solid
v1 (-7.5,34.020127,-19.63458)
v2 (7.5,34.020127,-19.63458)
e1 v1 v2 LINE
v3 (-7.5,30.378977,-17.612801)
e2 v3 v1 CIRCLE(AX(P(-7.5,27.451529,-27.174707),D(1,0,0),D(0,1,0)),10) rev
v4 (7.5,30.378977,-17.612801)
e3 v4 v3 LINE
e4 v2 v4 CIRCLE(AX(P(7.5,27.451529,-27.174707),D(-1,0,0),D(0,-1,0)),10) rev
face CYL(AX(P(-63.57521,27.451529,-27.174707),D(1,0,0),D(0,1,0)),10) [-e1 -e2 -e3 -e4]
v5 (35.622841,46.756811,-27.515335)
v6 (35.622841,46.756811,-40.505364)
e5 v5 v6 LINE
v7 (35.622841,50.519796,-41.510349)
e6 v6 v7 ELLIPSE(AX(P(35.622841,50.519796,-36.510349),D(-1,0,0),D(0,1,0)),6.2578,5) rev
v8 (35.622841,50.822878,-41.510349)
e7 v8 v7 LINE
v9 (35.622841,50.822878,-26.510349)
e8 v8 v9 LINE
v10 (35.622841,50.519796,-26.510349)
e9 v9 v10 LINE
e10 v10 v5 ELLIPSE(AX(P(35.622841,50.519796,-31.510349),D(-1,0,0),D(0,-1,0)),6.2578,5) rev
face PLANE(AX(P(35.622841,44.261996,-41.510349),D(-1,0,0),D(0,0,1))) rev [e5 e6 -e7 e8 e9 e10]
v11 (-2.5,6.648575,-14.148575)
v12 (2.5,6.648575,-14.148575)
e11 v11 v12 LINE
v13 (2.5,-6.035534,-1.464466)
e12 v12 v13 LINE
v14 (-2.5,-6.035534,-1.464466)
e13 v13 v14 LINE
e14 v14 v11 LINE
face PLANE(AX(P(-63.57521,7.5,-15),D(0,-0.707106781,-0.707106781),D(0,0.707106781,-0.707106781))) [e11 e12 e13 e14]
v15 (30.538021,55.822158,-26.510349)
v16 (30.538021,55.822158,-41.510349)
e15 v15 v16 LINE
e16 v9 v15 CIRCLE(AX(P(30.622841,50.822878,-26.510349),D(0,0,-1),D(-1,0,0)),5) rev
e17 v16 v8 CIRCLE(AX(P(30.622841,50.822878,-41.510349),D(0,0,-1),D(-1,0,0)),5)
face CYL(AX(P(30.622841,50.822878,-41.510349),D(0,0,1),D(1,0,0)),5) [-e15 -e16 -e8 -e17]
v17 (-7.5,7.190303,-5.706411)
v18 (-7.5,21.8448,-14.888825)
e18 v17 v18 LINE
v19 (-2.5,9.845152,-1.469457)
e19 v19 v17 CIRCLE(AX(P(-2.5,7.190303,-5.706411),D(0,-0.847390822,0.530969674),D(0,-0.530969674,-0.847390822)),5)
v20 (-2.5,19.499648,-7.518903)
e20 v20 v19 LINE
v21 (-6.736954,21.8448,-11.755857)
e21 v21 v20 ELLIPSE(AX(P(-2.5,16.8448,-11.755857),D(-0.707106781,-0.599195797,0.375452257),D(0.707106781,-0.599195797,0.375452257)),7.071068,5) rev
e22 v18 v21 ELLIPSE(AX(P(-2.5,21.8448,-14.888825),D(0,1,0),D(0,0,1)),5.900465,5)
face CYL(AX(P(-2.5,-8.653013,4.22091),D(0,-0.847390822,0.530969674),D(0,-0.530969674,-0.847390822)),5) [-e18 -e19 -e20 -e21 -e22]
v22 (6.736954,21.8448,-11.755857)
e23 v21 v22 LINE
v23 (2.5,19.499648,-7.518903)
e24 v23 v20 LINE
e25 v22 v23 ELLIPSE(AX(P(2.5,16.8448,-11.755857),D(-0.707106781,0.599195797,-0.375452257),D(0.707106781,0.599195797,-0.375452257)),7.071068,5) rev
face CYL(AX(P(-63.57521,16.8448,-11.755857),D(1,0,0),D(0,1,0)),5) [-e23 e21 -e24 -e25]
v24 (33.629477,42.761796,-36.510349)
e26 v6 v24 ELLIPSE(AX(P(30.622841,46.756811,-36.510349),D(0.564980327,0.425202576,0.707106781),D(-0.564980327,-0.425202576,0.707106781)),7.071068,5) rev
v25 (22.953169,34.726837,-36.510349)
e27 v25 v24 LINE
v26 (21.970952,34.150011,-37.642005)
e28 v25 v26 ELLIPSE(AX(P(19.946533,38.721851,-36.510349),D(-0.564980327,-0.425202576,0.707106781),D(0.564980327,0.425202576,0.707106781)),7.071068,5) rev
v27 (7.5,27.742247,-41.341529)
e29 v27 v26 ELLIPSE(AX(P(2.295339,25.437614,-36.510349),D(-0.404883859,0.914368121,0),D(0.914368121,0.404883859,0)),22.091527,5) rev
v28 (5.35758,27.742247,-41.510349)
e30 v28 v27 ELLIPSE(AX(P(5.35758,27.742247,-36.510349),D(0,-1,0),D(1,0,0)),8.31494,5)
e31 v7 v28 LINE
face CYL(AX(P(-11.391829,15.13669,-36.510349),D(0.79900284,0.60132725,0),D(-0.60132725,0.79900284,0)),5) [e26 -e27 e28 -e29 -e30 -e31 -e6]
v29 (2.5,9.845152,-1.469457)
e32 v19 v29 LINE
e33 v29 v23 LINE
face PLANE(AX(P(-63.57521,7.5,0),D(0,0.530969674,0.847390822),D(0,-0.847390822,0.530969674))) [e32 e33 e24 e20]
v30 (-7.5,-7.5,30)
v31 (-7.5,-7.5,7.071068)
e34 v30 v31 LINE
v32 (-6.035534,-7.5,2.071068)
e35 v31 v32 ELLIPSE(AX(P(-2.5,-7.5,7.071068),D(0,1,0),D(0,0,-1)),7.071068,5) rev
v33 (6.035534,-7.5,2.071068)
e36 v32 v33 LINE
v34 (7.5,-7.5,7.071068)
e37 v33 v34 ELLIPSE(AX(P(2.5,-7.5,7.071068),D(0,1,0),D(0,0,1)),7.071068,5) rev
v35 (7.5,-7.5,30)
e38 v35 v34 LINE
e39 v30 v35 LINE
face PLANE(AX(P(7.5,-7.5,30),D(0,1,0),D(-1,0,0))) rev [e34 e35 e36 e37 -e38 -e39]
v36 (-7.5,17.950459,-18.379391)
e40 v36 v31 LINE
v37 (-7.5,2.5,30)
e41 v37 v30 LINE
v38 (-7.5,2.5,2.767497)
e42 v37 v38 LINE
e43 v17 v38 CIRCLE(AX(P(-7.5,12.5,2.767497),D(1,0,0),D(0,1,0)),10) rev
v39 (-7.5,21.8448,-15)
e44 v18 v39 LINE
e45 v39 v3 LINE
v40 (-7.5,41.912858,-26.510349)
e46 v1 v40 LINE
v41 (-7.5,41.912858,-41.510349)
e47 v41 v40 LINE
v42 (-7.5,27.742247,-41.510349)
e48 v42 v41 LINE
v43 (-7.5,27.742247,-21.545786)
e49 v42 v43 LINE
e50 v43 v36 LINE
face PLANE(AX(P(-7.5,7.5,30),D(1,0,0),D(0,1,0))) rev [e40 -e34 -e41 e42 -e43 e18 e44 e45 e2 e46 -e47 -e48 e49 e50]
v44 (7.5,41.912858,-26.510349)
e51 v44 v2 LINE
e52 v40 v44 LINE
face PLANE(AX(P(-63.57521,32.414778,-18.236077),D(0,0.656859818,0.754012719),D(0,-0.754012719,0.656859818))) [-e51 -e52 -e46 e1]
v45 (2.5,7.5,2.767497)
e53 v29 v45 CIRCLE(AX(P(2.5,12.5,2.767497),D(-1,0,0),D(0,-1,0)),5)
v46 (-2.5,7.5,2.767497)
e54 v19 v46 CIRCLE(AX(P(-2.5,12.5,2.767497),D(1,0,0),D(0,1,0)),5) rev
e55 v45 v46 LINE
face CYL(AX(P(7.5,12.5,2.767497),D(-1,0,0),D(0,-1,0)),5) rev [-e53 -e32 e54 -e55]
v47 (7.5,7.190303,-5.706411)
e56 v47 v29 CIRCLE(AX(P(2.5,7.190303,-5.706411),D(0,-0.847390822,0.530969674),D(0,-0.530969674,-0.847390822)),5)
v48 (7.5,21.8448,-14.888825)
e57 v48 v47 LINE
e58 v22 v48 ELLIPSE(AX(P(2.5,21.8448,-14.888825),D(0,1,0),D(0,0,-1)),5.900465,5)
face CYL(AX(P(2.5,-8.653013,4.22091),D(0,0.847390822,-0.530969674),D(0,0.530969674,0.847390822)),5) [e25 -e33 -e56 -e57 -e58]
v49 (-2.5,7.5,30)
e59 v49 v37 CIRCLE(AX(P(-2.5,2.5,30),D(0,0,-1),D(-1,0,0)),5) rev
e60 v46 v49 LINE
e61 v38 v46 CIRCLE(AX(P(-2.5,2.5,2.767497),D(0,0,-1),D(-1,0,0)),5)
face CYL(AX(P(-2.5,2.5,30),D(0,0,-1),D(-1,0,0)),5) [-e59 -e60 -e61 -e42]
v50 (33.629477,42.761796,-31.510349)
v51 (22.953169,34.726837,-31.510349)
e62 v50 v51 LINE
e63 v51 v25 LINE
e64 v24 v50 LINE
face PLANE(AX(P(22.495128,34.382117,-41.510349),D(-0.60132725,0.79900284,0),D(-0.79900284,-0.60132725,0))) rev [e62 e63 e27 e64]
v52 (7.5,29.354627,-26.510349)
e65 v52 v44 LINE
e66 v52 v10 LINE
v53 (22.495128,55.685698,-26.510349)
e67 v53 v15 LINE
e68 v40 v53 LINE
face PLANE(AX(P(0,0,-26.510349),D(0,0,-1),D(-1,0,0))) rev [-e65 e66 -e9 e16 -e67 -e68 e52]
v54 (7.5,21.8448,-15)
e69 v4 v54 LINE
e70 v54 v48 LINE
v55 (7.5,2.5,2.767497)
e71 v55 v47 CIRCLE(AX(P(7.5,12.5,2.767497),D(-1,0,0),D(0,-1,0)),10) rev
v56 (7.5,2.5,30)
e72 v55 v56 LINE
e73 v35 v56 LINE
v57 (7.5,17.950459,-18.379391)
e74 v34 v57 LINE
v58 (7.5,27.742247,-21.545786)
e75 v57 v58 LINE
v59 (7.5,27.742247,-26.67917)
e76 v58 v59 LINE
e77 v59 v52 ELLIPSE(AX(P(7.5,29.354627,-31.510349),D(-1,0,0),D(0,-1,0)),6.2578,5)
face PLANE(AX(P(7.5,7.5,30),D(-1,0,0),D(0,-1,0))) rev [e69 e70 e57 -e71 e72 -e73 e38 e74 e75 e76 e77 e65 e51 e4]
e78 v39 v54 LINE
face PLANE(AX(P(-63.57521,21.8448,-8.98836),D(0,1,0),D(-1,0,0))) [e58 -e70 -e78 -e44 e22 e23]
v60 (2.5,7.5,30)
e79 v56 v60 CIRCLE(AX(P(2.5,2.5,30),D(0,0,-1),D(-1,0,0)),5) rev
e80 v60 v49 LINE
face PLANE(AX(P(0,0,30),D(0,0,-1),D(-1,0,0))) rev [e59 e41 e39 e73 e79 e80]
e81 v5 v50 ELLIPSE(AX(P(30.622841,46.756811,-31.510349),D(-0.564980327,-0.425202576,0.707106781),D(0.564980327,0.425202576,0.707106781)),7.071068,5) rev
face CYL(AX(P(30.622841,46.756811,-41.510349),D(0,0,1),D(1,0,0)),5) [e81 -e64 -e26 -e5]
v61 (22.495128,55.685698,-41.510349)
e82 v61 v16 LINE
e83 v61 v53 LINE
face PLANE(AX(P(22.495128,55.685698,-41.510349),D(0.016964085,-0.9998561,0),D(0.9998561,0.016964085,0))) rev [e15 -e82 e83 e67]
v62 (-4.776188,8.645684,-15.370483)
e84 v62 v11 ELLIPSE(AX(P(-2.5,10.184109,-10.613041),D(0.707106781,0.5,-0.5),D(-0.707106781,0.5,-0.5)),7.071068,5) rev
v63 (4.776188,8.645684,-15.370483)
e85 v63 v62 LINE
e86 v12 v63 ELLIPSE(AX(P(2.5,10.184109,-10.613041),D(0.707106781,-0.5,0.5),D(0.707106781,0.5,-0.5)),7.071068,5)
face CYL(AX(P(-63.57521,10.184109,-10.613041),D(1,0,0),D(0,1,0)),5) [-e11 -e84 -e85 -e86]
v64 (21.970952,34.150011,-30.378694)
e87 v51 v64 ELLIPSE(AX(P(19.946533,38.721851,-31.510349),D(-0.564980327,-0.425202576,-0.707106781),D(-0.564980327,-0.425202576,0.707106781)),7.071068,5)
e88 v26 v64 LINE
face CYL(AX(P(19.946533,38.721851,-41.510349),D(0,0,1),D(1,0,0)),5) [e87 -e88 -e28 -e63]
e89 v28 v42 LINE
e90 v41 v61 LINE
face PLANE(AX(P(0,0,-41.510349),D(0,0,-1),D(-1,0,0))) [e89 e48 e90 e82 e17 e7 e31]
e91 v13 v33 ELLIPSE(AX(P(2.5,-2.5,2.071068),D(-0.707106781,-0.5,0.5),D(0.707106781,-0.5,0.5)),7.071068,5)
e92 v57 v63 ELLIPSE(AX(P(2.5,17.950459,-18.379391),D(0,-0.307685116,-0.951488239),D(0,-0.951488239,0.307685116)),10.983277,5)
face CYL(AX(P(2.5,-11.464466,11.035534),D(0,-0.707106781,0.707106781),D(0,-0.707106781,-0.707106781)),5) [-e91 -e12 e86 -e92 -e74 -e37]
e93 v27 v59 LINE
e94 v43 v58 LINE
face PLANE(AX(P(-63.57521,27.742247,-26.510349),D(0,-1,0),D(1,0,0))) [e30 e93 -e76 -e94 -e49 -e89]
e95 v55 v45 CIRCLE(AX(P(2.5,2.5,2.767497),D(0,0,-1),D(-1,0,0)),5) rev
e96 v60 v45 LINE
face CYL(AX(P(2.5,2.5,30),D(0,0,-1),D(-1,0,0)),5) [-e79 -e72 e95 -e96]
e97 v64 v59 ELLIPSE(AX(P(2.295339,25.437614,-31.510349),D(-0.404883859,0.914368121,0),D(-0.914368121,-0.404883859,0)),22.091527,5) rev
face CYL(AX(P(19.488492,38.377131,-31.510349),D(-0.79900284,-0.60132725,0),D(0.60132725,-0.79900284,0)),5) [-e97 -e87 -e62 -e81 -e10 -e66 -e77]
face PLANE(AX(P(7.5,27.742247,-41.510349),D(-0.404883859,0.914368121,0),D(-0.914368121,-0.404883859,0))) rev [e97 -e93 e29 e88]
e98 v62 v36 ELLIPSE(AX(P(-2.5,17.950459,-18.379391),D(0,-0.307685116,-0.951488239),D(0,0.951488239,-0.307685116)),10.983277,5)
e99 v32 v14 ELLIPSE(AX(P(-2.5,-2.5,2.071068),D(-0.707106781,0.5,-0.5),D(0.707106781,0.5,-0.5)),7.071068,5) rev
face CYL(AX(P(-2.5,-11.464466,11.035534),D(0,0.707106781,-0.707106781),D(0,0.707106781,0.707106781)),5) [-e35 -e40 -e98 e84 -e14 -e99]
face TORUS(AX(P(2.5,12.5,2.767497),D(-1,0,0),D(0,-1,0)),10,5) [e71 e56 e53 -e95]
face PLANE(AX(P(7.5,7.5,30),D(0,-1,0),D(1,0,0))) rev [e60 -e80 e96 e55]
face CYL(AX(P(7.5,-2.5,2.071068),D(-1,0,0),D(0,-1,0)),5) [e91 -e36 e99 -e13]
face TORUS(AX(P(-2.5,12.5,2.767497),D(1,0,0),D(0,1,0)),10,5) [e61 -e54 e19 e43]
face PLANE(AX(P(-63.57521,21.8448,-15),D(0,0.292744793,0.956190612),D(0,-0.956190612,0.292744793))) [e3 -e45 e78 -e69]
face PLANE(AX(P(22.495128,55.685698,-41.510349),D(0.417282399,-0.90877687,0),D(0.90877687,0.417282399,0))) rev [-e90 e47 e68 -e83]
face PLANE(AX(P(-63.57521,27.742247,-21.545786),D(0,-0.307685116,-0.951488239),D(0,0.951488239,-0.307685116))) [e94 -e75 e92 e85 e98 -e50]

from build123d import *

# Parameters (mm, degrees)
SKETCH1_W           = 15
SKETCH1_H           = 15
BOSS_EXTRUDE1_DEPTH = 30
BOSS_EXTRUDE2_DEPTH = 15
BOSS_EXTRUDE3_DEPTH = 15
FILLET1_R           = 5
FILLET2_R           = 5
FILLET3_R           = 5
FILLET4_R           = 5
FILLET5_R           = 10


with BuildPart() as part:
    # Sketch1 → Boss-Extrude1 (new body)
    with BuildSketch(Plane.XY):
        Rectangle(SKETCH1_W, SKETCH1_H)
    extrude(amount=BOSS_EXTRUDE1_DEPTH)

    # Sketch2 → Boss-Extrude2 (add)
    with BuildSketch(Plane(origin=(7.5, 0, 0), x_dir=(0, 0, -1), z_dir=(1, 0, 0))):
        Polygon((0, 7.5), (0, -7.5), (15, 7.5), (21.545785732, 27.742247112), (26.510349476, 27.742247112), (26.510349476, 32.414777695), (26.510349476, 41.912857566), (18.236076569, 32.414777695), (15, 21.844799658), (8.988359791, 21.844799658), align=None)
    extrude(amount=-BOSS_EXTRUDE2_DEPTH)

    # Sketch3 → Boss-Extrude3 (add)
    with BuildSketch(Plane(origin=(0, 0, -26.510349476), x_dir=(-1, 0, 0), z_dir=(0, 0, -1))):
        Polygon((-7.5, 27.742247112), (-22.495127837, 34.382116855), (-35.622841112, 44.261996271), (-35.622841112, 55.90842978), (-22.495127837, 55.685698079), (7.5, 41.912857566), (7.5, 27.742247112), align=None)
    extrude(amount=BOSS_EXTRUDE3_DEPTH)

    # Fillet1
    fillet1_edges = [part.edges().sort_by_distance(p)[0] for p in [
        (35.622841112, 55.90842978, -34.010349476),
    ]]
    fillet(fillet1_edges, radius=FILLET1_R)

    # Fillet2
    # the kernel refuses this fillet: 5 mm, written as the material it takes off along each edge
    with BuildSketch(Plane(origin=(-7.467478677, 11.832344997, -41.510349476), x_dir=(0, 0, 1), z_dir=(0.7990028403879673, 0.6013272495504927, 0))) as fillet2_piece_1:
        with BuildLine():
            CenterArc((FILLET2_R, -FILLET2_R), FILLET2_R, 90, 90)
            Line((0, -FILLET2_R), (0, 0))
            Line((0, 0), (FILLET2_R, 0))
        make_face()
    extrude(amount=66.430120909, mode=Mode.SUBTRACT)
    with BuildSketch(Plane(origin=(22.495127837, 34.382116855, -25.077185007), x_dir=(0.7990028403879682, 0.6013272495504913, 0), z_dir=(0, 0, -1))) as fillet2_piece_2:
        with BuildLine():
            CenterArc((FILLET2_R * 0.11465315755, -FILLET2_R), FILLET2_R, 90, 13.081164811)
            Line((-FILLET2_R * 0.111677956622, -FILLET2_R * 0.0259495768916), (0, 0))
            Line((0, 0), (FILLET2_R * 0.11465315755, 0))
        make_face()
    extrude(amount=17.866328939, mode=Mode.SUBTRACT)
    with BuildSketch(Plane(origin=(-7.467478677, 11.832344997, -26.510349476), x_dir=(-0.6013272495504927, 0.7990028403879673, 0), z_dir=(0.7990028403879673, 0.6013272495504927, 0))) as fillet2_piece_3_section:
        with BuildLine():
            CenterArc((FILLET2_R, -FILLET2_R), FILLET2_R, 90, 90)
            Line((0, -FILLET2_R), (0, 0))
            Line((0, 0), (FILLET2_R, 0))
        make_face()
    fillet2_piece_3 = extrude(amount=66.430120909, mode=Mode.PRIVATE)
    fillet2_piece_3 = split(fillet2_piece_3, bisect_by=Plane(origin=(7.5, 11.832344997, -26.510349476), z_dir=(1, 0, 0)), keep=Keep.TOP, mode=Mode.PRIVATE)
    add(fillet2_piece_3, mode=Mode.SUBTRACT)
    with BuildSketch(Plane(origin=(35.622841112, 44.261996271, -20.2733136), x_dir=(0, 1, 0), z_dir=(0, 0, -1))) as fillet2_piece_4:
        with BuildLine():
            CenterArc((FILLET2_R * 0.498962870089, -FILLET2_R), FILLET2_R, 90, 53.03498585)
            Line((-FILLET2_R * 0.300039970299, -FILLET2_R * 0.39867275045), (0, 0))
            Line((0, 0), (FILLET2_R * 0.498962870089, 0))
        make_face()
    extrude(amount=27.474071752, mode=Mode.SUBTRACT)

    # Fillet3
    fillet3_edges = [part.edges().sort_by_distance(p)[0] for p in [
        (0, 7.5, -15),
        (7.5, 0, -7.5),
        (-7.5, 0, -7.5),
        (0, -7.5, 0),
    ]]
    fillet(fillet3_edges, radius=FILLET3_R)

    # Fillet4
    fillet4_edges = [part.edges().sort_by_distance(p)[0] for p in [
        (0, 21.844799658, -8.988359791),
        (7.5, 14.672399829, -4.494179896),
        (-7.5, 14.672399829, -4.494179896),
        (0, 7.5, 0),
        (-7.5, 7.5, 15),
        (7.5, 7.5, 15),
    ]]
    fillet(fillet4_edges, radius=FILLET4_R)

    # Fillet5
    fillet5_edges = [part.edges().sort_by_distance(p)[0] for p in [
        (0, 32.414777695, -18.236076569),
    ]]
    fillet(fillet5_edges, radius=FILLET5_R)


solid = part.part
